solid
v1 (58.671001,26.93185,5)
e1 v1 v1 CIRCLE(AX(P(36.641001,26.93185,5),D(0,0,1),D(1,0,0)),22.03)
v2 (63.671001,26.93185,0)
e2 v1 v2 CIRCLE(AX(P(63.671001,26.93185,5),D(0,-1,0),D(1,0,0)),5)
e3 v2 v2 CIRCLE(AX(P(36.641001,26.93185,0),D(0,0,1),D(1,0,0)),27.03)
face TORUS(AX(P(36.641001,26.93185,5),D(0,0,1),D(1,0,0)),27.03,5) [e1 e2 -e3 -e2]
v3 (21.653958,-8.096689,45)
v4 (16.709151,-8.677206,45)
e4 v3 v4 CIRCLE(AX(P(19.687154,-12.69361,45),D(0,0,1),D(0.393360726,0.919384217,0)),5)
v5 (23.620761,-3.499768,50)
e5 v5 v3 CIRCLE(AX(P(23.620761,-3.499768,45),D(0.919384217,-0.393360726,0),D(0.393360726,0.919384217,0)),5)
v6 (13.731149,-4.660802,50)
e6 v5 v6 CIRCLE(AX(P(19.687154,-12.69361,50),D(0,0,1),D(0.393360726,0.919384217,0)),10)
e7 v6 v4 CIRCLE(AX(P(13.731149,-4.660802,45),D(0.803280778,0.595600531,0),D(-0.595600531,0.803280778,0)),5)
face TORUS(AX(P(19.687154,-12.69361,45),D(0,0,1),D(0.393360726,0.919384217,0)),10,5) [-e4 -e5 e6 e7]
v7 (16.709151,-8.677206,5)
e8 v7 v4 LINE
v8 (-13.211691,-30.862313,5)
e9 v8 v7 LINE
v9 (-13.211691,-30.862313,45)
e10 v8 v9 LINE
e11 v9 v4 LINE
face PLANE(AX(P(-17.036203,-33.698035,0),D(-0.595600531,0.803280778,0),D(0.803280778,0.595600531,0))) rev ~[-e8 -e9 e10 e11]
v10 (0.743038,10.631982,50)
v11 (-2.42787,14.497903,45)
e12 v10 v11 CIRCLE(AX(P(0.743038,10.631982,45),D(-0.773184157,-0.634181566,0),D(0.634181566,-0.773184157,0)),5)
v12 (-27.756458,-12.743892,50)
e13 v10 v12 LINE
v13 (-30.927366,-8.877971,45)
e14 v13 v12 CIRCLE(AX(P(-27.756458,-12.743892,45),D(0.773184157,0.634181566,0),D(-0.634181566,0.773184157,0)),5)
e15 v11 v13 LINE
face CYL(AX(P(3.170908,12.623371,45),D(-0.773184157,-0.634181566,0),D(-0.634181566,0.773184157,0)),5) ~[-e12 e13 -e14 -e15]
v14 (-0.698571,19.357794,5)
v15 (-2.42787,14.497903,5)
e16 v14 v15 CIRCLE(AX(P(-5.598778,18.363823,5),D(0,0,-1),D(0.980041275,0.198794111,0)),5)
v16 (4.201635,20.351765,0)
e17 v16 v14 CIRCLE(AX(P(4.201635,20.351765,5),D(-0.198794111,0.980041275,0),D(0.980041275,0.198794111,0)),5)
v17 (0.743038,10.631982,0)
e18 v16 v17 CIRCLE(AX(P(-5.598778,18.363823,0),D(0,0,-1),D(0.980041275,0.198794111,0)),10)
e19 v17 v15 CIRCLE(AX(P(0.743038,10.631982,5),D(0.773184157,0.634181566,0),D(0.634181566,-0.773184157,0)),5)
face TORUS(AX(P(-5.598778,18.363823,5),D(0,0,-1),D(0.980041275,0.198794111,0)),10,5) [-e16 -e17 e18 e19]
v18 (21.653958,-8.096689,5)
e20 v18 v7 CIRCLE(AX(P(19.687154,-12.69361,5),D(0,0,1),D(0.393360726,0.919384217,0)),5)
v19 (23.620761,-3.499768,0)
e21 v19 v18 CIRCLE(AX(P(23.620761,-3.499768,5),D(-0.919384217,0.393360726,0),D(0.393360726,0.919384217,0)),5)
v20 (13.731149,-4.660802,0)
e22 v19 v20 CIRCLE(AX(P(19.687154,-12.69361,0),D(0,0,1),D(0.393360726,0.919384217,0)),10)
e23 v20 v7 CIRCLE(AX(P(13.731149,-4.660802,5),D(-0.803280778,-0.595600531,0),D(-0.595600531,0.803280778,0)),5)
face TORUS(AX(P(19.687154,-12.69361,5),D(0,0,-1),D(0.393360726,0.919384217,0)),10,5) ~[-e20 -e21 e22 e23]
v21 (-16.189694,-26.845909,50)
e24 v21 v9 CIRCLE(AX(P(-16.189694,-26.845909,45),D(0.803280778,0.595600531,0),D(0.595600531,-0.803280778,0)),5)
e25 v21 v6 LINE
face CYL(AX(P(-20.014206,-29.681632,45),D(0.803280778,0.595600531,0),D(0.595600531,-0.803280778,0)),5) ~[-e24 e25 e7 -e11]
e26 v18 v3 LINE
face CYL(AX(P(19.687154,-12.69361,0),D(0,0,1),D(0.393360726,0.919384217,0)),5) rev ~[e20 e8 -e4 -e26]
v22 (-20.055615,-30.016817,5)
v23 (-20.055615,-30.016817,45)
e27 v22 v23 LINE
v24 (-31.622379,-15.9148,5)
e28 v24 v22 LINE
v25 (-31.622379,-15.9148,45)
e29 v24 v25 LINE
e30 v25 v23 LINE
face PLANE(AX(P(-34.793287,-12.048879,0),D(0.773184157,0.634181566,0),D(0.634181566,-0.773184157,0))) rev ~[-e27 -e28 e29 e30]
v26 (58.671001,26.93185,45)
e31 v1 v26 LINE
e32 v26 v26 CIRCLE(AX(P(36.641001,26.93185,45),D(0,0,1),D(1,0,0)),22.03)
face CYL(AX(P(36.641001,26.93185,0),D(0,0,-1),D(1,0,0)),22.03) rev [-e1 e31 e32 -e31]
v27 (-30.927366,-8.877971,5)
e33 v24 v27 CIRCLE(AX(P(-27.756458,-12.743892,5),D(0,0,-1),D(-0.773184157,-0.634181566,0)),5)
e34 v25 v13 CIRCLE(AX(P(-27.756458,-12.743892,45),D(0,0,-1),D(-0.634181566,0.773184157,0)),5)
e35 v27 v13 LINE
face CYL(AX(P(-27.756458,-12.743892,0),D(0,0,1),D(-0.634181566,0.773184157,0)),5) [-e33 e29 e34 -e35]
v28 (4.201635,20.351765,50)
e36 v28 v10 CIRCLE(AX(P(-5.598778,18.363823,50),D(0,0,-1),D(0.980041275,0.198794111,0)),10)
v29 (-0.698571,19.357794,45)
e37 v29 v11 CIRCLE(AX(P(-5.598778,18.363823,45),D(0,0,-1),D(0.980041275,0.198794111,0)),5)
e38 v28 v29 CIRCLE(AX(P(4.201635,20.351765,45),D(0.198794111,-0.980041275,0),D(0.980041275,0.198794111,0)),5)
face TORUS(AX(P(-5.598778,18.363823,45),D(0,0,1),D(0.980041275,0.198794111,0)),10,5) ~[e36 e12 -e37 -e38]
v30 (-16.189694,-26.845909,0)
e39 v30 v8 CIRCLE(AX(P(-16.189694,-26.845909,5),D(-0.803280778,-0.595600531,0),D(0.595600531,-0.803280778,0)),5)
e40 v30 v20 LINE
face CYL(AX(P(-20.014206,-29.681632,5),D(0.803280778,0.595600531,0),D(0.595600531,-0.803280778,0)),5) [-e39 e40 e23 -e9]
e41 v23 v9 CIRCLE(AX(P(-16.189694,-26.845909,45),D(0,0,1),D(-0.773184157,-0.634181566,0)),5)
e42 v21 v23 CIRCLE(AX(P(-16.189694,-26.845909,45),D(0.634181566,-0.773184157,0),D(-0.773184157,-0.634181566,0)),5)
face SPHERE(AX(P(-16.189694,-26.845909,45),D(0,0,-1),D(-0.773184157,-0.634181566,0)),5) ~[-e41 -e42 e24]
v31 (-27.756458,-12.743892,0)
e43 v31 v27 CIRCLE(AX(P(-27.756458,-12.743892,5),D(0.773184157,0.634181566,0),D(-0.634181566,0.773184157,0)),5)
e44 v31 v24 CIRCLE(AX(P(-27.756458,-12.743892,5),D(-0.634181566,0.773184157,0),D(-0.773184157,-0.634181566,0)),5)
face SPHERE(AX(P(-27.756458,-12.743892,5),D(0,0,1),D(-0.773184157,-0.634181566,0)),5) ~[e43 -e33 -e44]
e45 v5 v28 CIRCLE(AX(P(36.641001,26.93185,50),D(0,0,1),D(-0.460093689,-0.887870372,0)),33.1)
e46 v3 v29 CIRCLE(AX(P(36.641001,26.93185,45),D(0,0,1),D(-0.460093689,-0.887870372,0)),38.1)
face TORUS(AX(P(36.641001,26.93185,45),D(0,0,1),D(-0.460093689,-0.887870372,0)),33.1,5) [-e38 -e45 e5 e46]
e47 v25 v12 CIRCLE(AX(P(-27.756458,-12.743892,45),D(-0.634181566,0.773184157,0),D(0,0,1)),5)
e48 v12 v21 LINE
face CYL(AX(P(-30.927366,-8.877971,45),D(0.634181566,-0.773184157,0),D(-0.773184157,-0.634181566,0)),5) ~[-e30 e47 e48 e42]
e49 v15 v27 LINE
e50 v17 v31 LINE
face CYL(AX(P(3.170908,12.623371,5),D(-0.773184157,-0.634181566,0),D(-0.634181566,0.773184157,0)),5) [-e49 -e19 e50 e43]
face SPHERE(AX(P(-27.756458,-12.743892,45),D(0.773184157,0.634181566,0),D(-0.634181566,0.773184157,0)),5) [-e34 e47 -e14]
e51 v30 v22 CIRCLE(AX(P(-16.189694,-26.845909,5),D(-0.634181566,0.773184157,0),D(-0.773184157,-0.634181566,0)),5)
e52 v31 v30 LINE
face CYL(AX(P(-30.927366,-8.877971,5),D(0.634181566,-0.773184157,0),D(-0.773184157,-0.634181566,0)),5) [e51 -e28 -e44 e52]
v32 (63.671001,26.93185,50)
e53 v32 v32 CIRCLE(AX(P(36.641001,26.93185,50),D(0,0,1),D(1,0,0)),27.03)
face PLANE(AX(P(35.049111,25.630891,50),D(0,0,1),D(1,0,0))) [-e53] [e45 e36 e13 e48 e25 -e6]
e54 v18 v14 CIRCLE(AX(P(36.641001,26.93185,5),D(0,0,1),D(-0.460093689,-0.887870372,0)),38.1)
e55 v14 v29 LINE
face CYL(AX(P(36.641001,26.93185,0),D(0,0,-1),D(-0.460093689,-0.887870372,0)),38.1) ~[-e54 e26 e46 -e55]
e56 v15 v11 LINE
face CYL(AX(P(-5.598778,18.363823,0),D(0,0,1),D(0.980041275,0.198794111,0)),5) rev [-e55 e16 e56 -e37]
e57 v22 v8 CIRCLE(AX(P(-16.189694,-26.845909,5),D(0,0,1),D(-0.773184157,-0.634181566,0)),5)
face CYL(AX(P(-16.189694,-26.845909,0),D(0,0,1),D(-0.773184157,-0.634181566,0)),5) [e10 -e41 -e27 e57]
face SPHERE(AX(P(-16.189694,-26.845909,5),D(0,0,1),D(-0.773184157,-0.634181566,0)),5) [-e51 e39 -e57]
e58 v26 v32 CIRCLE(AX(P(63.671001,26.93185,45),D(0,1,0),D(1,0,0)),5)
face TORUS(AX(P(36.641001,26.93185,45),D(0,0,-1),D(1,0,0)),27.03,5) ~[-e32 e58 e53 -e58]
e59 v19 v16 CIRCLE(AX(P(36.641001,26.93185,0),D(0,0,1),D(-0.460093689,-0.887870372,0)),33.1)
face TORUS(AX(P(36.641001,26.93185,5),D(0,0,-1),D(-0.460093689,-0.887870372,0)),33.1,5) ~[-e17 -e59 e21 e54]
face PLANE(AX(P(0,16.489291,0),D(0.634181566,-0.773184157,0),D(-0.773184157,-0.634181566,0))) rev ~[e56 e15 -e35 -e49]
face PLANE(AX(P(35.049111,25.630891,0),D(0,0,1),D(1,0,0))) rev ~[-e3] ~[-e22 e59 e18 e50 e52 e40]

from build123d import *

# Parameters (mm, degrees)
F0_R     = 22.03
F1_DEPTH = 50
F2_R     = 5


with BuildPart() as f1:
    # F0 (on Top) → F1 (new body)
    with BuildSketch(Plane.XY):
        with BuildLine():
            ThreePointArc((19.111431778, -6.8960115293), (56.4366245885, -5.6218490797), (74.7410013376, 26.9318496366))
            ThreePointArc((74.7410013376, 26.9318496366), (31.369006979, 64.6653370911), (0, 16.4892914742))
            ThreePointArc((0, 16.4892914742), (7.1396320987, 2.8221168918), (19.111431778, -6.8960115293))
        make_face()
        with Locations((36.6410013376, 26.9318496366)):
            Circle(F0_R, mode=Mode.SUBTRACT)
        with BuildLine():
            ThreePointArc((19.111431778, -6.8960115293), (7.1396320987, 2.8221168918), (0, 16.4892914742))
            Line((0, 16.4892914742), (-34.7932870747, -12.0488790092))
            Line((-34.7932870747, -12.0488790092), (-17.0362032183, -33.6980354112))
            Line((-17.0362032183, -33.6980354112), (19.111431778, -6.8960115293))
        make_face()
    extrude(amount=F1_DEPTH)

    # F2
    f2_edges = [f1.edges().sort_by_distance(p)[0] for p in [
        (66.142371, 51.041582, 50),
        (14.611001, 26.93185, 50),
        (-17.396644, 2.220206, 50),
        (1.037614, -20.297023, 50),
        (0, 16.489291, 25),
        (-34.793287, -12.048879, 25),
        (19.111432, -6.896012, 25),
        (-17.036203, -33.698035, 25),
        (-25.914745, -22.873457, 0),
        (-25.914745, -22.873457, 50),
        (66.142371, 51.041582, 0),
        (14.611001, 26.93185, 0),
        (-17.396644, 2.220206, 0),
        (1.037614, -20.297023, 0),
    ]]
    fillet(f2_edges, radius=F2_R)


solid = f1.part
